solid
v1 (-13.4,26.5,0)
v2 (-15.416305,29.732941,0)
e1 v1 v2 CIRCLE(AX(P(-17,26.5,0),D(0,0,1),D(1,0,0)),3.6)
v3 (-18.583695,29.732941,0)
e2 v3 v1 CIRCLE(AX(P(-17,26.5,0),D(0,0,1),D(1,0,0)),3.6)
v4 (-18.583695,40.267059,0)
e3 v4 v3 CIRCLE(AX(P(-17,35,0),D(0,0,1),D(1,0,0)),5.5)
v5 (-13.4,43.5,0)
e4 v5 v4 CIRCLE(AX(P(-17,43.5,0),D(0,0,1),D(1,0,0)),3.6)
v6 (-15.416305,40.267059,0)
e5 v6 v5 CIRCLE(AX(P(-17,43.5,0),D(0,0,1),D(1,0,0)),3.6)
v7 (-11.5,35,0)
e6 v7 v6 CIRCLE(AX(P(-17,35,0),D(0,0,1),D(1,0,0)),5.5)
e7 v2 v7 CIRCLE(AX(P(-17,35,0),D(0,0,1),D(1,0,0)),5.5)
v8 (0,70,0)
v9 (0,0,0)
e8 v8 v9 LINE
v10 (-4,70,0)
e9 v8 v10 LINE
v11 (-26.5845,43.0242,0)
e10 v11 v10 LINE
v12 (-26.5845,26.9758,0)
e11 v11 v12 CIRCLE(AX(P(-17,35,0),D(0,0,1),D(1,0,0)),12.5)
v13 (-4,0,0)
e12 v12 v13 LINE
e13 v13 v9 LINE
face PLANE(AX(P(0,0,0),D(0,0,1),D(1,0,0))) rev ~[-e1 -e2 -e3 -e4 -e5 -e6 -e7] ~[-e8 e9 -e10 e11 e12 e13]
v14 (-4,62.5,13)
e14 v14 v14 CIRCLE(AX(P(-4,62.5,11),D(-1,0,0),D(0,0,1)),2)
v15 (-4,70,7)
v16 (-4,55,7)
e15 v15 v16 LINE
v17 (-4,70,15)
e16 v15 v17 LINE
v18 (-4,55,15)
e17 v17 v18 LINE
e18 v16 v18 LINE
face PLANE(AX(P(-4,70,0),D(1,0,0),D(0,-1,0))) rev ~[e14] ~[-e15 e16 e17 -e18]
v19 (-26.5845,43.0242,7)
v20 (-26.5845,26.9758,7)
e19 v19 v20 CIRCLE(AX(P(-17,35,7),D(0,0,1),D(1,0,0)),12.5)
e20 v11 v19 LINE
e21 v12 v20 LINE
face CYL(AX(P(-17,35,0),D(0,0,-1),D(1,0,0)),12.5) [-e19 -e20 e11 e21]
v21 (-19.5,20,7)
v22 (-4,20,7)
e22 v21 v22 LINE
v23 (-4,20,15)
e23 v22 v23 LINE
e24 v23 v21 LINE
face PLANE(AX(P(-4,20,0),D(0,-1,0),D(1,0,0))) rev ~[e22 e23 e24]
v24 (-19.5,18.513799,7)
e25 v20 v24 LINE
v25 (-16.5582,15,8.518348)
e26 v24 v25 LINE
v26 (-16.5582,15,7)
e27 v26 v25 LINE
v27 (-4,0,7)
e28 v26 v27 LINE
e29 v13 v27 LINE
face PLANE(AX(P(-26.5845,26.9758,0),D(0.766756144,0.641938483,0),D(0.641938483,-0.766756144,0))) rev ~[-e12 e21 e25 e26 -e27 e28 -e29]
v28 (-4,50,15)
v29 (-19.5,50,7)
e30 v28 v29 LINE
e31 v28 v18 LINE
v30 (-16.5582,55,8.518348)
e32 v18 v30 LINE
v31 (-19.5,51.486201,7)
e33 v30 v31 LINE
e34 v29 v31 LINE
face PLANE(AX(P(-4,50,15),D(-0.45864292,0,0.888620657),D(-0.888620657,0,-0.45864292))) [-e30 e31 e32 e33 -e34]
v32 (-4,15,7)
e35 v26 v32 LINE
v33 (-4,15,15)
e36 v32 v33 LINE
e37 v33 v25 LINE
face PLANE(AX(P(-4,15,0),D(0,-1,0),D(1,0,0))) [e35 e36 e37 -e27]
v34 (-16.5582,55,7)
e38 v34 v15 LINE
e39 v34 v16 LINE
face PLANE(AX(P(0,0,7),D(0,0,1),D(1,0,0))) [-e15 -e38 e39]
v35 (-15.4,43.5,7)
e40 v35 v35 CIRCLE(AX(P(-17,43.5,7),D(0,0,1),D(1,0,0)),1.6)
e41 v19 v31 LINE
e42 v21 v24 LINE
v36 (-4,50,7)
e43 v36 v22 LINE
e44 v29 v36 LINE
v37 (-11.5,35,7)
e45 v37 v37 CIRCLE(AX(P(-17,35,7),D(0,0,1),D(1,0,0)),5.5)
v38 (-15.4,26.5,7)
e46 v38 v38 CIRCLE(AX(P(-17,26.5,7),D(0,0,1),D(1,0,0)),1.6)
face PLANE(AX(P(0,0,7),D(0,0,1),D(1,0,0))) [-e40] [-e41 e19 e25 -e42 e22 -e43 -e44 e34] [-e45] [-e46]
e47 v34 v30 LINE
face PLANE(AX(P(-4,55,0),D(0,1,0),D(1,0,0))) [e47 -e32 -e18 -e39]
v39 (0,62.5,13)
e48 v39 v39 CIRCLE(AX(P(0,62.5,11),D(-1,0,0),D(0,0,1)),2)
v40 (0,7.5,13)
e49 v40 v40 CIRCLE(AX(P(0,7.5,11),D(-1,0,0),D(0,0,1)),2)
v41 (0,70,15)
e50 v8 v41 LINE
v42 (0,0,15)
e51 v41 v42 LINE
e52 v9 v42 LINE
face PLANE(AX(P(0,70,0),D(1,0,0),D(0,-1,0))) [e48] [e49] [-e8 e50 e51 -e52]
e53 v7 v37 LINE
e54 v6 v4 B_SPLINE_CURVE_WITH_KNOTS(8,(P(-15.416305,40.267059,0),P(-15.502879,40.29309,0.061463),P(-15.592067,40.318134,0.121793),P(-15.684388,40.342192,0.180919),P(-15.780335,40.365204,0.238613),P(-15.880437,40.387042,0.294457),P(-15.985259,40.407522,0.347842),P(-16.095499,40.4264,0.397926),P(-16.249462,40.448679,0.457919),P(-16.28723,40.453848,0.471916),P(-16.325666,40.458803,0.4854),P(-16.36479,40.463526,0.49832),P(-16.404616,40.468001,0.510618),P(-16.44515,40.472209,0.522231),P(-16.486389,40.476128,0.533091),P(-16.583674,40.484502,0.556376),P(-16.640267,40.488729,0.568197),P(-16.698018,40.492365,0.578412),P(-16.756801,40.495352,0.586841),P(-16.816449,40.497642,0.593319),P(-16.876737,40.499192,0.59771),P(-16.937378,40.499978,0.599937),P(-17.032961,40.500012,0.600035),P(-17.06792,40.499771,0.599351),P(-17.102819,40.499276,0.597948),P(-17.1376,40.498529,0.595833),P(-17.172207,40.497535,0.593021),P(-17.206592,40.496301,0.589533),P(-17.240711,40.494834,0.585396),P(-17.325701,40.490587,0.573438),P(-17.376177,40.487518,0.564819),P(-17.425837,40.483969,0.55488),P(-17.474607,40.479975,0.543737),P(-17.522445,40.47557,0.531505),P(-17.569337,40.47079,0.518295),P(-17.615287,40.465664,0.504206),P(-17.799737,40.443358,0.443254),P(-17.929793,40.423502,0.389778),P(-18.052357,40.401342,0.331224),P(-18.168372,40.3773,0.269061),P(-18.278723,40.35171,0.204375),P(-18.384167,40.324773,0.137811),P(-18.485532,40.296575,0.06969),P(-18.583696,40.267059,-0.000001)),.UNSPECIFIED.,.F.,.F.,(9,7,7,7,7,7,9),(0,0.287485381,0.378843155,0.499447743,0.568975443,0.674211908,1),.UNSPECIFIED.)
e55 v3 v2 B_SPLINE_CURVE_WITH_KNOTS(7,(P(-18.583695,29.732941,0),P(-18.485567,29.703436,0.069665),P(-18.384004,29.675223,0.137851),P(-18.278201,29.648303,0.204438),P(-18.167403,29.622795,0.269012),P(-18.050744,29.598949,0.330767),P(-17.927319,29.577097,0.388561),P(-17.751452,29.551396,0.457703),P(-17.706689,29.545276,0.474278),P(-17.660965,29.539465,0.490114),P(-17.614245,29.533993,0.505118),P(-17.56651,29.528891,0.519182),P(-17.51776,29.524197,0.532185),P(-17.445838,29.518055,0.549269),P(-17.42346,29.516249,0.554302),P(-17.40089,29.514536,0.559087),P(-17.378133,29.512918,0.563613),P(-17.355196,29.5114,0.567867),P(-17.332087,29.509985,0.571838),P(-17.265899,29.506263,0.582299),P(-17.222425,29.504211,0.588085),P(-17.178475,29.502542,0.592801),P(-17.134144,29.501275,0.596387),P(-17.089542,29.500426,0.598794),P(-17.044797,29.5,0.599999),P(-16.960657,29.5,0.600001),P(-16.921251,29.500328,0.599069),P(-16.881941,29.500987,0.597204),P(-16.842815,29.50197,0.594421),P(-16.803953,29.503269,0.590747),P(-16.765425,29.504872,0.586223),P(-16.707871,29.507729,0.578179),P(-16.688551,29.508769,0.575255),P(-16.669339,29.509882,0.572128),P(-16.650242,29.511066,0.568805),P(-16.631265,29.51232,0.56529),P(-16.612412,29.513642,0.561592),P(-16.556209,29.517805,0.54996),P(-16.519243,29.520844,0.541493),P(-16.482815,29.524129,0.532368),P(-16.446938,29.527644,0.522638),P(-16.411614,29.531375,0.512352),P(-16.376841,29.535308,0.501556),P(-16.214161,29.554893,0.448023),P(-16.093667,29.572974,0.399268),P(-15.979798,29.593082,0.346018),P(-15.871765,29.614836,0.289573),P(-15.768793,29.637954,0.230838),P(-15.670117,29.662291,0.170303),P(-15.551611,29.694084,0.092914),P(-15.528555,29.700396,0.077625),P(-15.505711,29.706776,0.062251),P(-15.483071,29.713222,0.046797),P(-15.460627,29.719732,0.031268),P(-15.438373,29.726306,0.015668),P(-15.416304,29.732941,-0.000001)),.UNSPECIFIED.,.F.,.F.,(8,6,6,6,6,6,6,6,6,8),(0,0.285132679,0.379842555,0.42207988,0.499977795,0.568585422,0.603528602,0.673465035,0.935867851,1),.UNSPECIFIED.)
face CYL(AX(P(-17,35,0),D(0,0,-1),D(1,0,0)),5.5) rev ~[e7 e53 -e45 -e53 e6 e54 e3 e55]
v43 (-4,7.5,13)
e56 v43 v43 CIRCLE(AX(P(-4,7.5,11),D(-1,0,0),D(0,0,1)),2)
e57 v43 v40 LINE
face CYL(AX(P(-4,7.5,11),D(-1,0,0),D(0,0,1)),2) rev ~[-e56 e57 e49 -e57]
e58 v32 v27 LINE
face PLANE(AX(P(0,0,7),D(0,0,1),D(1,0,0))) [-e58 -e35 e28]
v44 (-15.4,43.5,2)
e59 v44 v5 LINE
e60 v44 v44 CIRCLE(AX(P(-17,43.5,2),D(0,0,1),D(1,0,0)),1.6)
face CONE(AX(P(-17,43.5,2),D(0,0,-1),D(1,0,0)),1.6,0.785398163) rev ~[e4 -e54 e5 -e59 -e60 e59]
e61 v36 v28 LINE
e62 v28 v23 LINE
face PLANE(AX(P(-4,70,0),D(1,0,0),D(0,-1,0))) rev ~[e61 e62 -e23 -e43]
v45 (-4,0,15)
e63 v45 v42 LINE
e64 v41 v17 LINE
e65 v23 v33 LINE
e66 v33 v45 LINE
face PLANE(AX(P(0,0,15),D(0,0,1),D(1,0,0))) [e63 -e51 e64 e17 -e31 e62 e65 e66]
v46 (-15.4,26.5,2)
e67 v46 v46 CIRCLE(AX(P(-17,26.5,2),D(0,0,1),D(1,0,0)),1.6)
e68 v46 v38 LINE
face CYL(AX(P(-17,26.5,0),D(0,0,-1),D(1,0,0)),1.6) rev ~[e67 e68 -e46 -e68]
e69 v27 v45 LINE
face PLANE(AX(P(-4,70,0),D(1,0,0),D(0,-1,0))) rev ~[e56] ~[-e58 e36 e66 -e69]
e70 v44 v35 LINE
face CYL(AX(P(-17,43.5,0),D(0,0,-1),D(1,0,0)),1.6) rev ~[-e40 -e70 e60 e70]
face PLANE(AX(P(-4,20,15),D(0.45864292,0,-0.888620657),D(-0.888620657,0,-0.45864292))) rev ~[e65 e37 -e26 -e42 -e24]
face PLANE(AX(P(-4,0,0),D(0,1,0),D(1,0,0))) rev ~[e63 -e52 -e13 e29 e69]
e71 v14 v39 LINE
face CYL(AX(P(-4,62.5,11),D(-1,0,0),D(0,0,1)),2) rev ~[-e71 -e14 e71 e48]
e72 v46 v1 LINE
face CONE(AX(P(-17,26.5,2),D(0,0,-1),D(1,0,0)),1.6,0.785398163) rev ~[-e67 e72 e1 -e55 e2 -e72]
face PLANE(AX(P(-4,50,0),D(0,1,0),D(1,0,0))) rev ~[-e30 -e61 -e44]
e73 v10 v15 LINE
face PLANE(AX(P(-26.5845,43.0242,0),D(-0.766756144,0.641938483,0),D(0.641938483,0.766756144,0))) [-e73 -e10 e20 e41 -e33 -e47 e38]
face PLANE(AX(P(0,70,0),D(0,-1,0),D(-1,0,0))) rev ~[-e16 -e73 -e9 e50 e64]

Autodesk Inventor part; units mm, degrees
sketch "Skizze1" plane through (0, 0, 0) normal (0, 0, 1) x (1, 0, 0)
  circle A0 centre (-17, 35) radius 12.5
  line L0 (0, 70) -> (0, 0)
  circle A1 centre (-17, 26.5) radius 1.6
  circle A2 centre (-17, 43.5) radius 1.6
  circle A3 centre (-17, 35) radius 5.5
  line L1 (3, 0) -> (0, 0)
  line L2 (0, 70) -> (-4, 70)
  line L3 (-4, 70) -> (-4, 0)
  line L4 (-4, 0) -> (0, 0)
  line L5 (0, 0) -> (0, 70)
  line L6 (-26.5845, 43.0242) -> (-4, 70)
  line L7 (-26.5845, 26.9758) -> (-4, 0)
  line L8 (0, 0) -> (-41.7952, 0)
  line L9 (-41.7952, 0) -> (-41.7952, 70)
  line L10 (-41.7952, 70) -> (0, 70)
  line L11 (0, 70) -> (0, 0)
  point P0 (0, 0)
  point P1 (0, 55)
  dimension "d0" = 25
  dimension "d2" = 8.5
  dimension "d3" = 17
  dimension "d6" = 3.2
  dimension "d7" = 3.2
  dimension "d8" = 11
  dimension "d10" = 70
  dimension "d11" = 17
  dimension "d23" = 4
extrude "Extrusion1" add sketch "Skizze1" along normal blind 7 contours A0 | A0 L6 L3 L7
ref_plane "Arbeitsebene1" through (0, 0, 39.5) normal (0, 0, 1) x (1, 0, 0)
extrude "Extrusion8" add sketch "Skizze1" along normal blind 15 contours L2 L0 L4 L3
ref_plane "Arbeitsebene2" through (-4, 50, 0) normal (0, 1, 0) x (1, 0, 0)
ref_plane "Arbeitsebene3" through (-4, 20, 0) normal (0, -1, 0) x (1, 0, 0)
sketch "Skizze8" plane through (-4, 50, 0) normal (0, 1, 0) x (1, 0, 0)
  line L0 (0, -15) -> (4, -15) projected
  line L1 (0, -15) -> (-15.5, -7)
  line L2 (-15.5, -7) -> (0, -7)
  line L3 (0, -7) -> (0, -15)
  line L4 (0, -7) -> (-22.5845, -7) projected
  point P0 (4, 0)
  dimension "d59" = 15.5
sketch "Skizze9" plane through (-4, 20, 0) normal (0, -1, 0) x (1, 0, 0)
  line L0 (0, 15) -> (-15.5, 7) projected
  line L1 (0, 7) -> (0, 15) projected
  line L2 (-15.5, 7) -> (0, 7) projected
  line L3 (-15.5, 7) -> (0, 15)
  line L4 (-22.5845, 7) -> (0, 7) projected
  line L5 (0, 7) -> (0, 15)
  line L6 (-15.5, 7) -> (0, 7)
  point P0 (4, 0)
extrude "Extrusion9" add sketch "Skizze9" along normal blind 5
extrude "Extrusion10" add sketch "Skizze8" along normal blind 5
extrude "Extrusion11" cut sketch "Skizze1" along normal blind 20 contours A0 L7 L8 L9 L10 L6
sketch "Skizze10" plane through (-4, 0, 7) normal (-1, 0, 0) x (0, 0, 1)
  circle A0 centre (4, 7.5) radius 2
  circle A1 centre (4, 62.5) radius 2
  line L0 (0, 70) -> (8, 70) projected
  line L1 (1.5184, 55) -> (8, 55) projected
  line L2 (0, 0) -> (8, 0) projected
  line L3 (8, 15) -> (8, 0) projected
  line L4 (8, 70) -> (8, 55) projected
  line L5 (-7, 26.9758) -> (-7, 0) projected
  dimension "d67" = 4
  dimension "d68" = 4
  dimension "d69" = 7.5
  dimension "d71" = 7.5
  dimension "d72" = 4
  dimension "d73" = 4
  dimension "d76" = 11
extrude "Extrusion12" cut sketch "Skizze10" against normal blind 4
chamfer "Fase1" distance 2 angle 45 2 edges at (-18.6, 43.5, 0) (-18.6, 26.5, 0)
equation "\"d6\" = d7"
equation "\"d68\" = d67"
equation "\"d71\" = d69"
properties part number "motor mount"
